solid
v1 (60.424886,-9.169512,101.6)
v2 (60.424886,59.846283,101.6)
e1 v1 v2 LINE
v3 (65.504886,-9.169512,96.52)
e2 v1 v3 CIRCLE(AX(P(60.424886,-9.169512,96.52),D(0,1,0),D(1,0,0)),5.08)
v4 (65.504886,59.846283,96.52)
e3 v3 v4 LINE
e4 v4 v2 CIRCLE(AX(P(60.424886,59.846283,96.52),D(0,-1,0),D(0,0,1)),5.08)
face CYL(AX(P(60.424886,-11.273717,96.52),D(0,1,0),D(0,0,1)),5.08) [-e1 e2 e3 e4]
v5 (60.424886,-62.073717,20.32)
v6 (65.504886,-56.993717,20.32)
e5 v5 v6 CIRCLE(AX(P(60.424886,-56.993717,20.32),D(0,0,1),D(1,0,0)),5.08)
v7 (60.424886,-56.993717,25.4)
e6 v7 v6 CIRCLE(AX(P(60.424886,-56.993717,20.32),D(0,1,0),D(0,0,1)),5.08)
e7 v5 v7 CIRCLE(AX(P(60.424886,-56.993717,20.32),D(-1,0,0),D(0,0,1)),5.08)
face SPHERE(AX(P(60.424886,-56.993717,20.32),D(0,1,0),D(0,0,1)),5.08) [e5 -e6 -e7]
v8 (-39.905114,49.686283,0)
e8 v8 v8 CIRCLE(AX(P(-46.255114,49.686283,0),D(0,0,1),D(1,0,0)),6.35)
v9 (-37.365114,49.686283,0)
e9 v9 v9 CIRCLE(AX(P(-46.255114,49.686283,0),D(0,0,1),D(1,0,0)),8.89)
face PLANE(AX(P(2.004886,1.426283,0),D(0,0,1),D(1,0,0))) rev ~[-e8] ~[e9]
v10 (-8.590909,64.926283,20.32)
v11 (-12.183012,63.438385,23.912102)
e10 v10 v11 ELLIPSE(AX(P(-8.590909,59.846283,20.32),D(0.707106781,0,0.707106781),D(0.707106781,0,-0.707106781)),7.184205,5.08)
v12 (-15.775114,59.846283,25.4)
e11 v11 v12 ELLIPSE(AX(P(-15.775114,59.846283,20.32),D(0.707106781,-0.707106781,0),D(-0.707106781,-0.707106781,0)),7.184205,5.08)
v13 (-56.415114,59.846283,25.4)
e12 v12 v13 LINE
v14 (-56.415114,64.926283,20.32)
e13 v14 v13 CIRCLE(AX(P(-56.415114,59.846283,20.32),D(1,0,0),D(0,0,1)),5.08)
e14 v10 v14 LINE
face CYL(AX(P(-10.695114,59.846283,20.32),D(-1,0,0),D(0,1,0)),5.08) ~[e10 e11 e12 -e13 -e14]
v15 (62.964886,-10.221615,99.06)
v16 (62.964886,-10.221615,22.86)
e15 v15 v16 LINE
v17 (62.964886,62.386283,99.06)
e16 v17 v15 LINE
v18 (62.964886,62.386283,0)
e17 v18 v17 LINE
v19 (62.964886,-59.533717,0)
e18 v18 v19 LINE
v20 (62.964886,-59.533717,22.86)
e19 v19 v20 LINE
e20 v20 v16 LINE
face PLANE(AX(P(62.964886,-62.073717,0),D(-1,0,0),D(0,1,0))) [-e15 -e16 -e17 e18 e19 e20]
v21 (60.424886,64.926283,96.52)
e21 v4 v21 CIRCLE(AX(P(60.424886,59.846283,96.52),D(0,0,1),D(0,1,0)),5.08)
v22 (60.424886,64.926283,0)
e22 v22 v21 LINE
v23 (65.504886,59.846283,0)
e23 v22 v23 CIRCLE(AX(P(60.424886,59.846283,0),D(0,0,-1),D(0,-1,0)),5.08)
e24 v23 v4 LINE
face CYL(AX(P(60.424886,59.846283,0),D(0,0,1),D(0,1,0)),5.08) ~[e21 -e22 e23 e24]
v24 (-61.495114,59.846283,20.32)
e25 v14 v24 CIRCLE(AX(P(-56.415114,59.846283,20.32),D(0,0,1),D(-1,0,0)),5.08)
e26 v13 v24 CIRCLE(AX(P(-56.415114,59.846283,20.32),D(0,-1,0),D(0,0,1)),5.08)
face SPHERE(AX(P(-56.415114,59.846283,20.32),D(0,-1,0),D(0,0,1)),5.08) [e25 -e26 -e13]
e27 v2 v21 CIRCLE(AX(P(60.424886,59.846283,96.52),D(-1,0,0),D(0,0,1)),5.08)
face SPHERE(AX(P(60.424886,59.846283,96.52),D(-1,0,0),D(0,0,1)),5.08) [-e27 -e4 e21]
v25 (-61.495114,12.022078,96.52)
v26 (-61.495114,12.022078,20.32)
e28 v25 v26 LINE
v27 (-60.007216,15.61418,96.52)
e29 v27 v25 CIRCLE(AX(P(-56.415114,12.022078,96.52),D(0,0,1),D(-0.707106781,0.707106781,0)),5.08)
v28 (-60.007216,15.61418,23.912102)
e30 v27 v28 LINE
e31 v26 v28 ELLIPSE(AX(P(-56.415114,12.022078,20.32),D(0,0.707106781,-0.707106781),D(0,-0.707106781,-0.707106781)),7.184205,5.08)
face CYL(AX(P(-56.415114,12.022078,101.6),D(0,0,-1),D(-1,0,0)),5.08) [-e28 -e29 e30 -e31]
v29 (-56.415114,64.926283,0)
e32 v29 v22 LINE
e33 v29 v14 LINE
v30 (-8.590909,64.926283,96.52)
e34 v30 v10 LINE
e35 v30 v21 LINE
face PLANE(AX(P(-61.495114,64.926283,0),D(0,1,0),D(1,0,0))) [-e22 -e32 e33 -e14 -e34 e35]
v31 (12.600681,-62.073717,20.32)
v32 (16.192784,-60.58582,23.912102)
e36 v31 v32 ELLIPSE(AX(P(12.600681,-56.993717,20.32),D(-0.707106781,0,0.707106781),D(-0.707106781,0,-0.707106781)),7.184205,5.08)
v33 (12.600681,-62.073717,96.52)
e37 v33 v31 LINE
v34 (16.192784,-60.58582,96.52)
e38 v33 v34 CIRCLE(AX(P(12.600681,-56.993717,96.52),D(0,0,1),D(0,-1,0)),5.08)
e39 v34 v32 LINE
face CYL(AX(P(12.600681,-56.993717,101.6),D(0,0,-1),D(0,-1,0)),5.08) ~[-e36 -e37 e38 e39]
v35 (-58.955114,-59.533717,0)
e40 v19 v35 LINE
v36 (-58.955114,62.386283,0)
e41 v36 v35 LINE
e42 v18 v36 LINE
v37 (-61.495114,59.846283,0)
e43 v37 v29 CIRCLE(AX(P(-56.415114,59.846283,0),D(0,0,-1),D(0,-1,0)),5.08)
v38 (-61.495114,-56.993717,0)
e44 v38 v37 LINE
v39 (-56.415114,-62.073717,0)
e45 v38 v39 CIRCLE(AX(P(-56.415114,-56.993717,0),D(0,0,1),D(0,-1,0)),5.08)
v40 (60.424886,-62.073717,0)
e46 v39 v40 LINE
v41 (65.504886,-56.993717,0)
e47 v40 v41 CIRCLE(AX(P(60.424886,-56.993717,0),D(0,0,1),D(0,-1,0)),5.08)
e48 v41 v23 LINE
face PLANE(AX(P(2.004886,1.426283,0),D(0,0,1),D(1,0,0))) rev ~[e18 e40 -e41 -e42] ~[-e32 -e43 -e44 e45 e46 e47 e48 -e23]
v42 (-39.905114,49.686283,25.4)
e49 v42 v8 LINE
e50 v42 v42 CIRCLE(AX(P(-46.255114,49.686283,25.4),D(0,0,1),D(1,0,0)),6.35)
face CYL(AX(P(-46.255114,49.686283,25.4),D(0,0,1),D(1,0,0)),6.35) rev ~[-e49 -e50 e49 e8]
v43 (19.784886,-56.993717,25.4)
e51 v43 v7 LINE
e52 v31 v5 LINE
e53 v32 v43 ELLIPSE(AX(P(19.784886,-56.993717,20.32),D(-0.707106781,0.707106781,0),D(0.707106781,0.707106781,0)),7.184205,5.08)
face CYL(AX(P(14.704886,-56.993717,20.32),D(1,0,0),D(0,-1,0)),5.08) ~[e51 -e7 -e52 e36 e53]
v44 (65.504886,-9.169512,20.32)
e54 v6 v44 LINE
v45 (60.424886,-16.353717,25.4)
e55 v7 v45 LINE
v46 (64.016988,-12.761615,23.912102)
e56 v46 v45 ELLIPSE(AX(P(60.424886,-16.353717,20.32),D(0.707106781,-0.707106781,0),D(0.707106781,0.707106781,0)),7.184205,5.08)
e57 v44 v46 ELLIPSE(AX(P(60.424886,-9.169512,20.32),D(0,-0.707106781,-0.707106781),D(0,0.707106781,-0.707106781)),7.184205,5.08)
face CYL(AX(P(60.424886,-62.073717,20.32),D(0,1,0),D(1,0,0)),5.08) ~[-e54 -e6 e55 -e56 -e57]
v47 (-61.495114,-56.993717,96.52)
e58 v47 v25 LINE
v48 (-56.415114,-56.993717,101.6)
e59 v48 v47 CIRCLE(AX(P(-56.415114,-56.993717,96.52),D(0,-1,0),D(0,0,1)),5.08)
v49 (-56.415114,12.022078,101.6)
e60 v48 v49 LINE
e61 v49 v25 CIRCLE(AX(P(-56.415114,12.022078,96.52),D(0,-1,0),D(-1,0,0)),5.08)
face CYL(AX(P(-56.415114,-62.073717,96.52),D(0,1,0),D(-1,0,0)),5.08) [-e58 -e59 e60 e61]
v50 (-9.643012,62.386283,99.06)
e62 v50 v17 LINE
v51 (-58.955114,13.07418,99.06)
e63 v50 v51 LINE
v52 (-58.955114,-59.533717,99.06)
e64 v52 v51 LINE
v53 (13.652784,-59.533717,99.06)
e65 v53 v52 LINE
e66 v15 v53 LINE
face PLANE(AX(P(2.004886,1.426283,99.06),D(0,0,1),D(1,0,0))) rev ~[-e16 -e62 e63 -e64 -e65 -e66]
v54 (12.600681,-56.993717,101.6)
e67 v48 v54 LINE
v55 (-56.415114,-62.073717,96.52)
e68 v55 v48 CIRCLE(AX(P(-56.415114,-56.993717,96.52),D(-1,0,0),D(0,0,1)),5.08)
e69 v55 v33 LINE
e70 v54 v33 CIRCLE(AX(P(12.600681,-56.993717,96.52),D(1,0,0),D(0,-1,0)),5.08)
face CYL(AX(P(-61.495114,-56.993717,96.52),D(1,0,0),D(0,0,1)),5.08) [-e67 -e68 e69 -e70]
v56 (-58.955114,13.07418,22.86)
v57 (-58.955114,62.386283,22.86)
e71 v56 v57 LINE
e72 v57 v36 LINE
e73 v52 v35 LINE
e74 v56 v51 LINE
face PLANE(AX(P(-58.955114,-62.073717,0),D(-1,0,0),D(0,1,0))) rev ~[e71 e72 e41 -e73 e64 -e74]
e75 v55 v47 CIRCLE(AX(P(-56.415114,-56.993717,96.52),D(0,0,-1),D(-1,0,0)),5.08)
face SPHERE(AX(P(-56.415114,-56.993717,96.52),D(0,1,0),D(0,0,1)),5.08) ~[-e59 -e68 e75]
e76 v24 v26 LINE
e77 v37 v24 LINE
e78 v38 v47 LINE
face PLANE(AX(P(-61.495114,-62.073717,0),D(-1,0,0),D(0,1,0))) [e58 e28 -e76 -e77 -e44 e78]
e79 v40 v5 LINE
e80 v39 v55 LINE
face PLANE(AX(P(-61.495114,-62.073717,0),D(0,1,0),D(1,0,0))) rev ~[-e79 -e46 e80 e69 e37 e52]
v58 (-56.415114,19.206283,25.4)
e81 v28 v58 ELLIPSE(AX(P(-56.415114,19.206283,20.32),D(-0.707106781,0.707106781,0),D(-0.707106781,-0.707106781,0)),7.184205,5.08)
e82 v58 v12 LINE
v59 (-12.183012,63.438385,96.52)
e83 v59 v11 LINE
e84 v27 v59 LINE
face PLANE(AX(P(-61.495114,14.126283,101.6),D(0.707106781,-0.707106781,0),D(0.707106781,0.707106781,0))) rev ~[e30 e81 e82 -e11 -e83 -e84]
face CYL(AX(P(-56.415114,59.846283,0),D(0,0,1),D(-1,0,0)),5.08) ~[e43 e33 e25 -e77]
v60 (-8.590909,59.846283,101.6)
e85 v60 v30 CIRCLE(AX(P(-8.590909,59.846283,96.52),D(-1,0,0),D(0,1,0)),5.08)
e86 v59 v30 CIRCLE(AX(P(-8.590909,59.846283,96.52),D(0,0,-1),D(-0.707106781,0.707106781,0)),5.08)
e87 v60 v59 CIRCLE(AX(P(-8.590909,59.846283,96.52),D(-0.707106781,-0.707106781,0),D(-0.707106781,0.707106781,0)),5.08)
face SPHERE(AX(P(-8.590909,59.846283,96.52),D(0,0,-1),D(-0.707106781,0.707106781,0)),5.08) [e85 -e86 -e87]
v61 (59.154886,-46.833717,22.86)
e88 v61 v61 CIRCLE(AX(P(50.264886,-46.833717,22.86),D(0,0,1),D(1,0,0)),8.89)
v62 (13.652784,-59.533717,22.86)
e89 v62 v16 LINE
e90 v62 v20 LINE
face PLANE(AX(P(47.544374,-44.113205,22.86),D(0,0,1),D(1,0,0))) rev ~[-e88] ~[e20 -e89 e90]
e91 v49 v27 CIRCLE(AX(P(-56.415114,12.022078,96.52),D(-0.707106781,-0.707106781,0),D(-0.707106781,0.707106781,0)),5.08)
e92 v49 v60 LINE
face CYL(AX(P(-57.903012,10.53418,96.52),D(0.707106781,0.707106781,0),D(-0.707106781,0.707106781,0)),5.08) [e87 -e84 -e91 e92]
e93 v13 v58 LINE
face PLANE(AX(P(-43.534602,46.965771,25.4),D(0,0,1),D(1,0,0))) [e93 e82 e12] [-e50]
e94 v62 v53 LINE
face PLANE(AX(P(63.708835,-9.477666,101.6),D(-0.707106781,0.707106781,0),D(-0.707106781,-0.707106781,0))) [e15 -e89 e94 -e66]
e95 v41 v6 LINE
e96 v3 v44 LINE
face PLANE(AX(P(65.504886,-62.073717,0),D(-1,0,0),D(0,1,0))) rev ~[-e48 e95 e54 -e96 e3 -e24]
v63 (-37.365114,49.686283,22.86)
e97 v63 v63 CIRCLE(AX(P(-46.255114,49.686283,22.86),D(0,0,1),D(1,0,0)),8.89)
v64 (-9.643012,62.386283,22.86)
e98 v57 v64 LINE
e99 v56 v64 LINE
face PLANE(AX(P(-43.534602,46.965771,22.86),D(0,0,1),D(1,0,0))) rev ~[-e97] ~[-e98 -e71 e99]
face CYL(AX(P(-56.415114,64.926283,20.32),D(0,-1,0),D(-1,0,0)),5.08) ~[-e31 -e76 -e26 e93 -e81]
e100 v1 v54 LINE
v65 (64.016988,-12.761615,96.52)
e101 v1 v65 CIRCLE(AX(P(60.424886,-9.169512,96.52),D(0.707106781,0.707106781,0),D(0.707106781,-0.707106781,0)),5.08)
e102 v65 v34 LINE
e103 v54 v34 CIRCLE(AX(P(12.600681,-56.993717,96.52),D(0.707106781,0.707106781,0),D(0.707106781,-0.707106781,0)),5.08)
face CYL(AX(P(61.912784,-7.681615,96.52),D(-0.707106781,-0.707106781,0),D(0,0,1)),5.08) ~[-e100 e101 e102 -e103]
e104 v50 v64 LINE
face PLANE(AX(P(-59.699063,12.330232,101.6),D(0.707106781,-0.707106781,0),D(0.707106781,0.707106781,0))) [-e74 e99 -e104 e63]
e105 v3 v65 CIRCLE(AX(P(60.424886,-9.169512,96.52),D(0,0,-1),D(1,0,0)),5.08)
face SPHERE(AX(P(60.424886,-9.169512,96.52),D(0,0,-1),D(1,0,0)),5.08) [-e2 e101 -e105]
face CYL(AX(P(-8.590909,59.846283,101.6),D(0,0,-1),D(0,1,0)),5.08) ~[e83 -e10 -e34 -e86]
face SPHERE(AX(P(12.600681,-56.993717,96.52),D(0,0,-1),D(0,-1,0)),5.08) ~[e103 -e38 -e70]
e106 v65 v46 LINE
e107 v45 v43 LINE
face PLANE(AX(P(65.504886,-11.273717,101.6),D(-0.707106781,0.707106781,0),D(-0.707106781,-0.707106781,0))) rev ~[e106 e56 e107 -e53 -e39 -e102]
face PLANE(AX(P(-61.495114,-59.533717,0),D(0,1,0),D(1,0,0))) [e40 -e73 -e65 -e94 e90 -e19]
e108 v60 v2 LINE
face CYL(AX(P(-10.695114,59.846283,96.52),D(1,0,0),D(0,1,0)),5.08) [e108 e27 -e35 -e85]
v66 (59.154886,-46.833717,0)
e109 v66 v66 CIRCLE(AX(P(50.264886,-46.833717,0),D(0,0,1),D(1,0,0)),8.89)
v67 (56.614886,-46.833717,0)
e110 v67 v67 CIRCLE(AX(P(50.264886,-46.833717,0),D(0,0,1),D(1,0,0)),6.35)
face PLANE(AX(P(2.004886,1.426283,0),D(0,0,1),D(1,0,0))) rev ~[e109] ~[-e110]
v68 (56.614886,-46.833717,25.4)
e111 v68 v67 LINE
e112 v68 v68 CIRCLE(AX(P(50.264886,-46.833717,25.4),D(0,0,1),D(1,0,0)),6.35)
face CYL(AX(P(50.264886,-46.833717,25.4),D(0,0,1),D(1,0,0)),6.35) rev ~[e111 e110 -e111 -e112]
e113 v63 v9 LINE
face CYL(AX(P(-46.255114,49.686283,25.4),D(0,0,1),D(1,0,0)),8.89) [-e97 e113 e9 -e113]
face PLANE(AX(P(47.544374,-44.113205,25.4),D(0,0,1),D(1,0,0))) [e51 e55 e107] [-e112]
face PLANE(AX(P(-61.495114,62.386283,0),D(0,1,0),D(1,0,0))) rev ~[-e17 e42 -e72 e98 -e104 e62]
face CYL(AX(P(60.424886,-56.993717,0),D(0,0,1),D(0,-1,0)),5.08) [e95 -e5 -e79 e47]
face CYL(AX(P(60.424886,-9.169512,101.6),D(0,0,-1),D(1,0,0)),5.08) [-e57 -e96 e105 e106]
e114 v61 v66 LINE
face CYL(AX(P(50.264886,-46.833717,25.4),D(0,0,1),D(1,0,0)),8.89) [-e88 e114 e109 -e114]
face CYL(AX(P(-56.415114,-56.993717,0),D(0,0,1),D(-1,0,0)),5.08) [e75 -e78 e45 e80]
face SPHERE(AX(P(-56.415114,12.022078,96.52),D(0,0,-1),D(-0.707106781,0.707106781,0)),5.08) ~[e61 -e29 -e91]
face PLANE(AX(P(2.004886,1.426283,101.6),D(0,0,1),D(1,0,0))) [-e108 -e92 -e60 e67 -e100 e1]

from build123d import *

# Parameters (mm, degrees)
F0_W     = 127
F0_H     = 127
F1_DEPTH = 101.6
F3_DEPTH = 76.2
F4_R     = 6.35
F5_DEPTH = 203.2
F6_T     = -2.54
F7_R     = 5.08


# Not quite as in the source:
# - a feature names something its author has since deleted; it is built from what else it names


with BuildPart() as f1:
    # F0 (on Top) → F1 (new body)
    with BuildSketch(Plane.XY):
        with Locations((2.0048860461, 1.4262827701)):
            Rectangle(F0_W, F0_H)
    extrude(amount=F1_DEPTH)

    # F2 (on face) → F3 (cut)
    with BuildSketch(Plane.XY.offset(101.6)):
        Polygon((-61.4951139539, 14.1262827701), (-10.6951139539, 64.9262827701), (-61.4951139539, 64.9262827701), align=None)
        Polygon((65.5048860461, -62.0737172299), (65.5048860461, -11.2737172299), (14.7048860461, -62.0737172299), align=None)
    extrude(amount=-F3_DEPTH, mode=Mode.SUBTRACT)

    # F4 (on face) → F5 (cut)
    with BuildSketch(Plane.XY.offset(25.4)):
        with Locations((-46.2551139539, 49.6862827701)):
            Circle(F4_R)
        with Locations((50.2648860461, -46.8337172299)):
            Circle(F4_R)
    extrude(amount=-F5_DEPTH, mode=Mode.SUBTRACT)

    # F6
    f6_openings = [f1.faces().sort_by_distance(p)[0] for p in [
        (2.004886, 1.426283, 0),
    ]]
    offset(amount=F6_T, openings=f6_openings, kind=Kind.INTERSECTION)

    # F7
    f7_edges = [f1.edges().sort_by_distance(p)[0] for p in [
        (-36.095114, 39.526283, 101.6),
        (-61.495114, -23.973717, 101.6),
        (-23.395114, -62.073717, 101.6),
        (27.404886, 64.926283, 101.6),
        (65.504886, 26.826283, 101.6),
        (40.104886, -36.673717, 101.6),
        (-61.495114, 14.126283, 63.5),
        (-10.695114, 64.926283, 63.5),
        (-61.495114, 39.526283, 25.4),
        (-36.095114, 64.926283, 25.4),
        (-61.495114, 64.926283, 12.7),
        (-61.495114, -62.073717, 50.8),
        (14.704886, -62.073717, 63.5),
        (65.504886, -11.273717, 63.5),
        (65.504886, -36.673717, 25.4),
        (40.104886, -62.073717, 25.4),
        (65.504886, -62.073717, 12.7),
        (65.504886, 64.926283, 50.8),
    ]]
    fillet(f7_edges, radius=F7_R)


solid = f1.part
